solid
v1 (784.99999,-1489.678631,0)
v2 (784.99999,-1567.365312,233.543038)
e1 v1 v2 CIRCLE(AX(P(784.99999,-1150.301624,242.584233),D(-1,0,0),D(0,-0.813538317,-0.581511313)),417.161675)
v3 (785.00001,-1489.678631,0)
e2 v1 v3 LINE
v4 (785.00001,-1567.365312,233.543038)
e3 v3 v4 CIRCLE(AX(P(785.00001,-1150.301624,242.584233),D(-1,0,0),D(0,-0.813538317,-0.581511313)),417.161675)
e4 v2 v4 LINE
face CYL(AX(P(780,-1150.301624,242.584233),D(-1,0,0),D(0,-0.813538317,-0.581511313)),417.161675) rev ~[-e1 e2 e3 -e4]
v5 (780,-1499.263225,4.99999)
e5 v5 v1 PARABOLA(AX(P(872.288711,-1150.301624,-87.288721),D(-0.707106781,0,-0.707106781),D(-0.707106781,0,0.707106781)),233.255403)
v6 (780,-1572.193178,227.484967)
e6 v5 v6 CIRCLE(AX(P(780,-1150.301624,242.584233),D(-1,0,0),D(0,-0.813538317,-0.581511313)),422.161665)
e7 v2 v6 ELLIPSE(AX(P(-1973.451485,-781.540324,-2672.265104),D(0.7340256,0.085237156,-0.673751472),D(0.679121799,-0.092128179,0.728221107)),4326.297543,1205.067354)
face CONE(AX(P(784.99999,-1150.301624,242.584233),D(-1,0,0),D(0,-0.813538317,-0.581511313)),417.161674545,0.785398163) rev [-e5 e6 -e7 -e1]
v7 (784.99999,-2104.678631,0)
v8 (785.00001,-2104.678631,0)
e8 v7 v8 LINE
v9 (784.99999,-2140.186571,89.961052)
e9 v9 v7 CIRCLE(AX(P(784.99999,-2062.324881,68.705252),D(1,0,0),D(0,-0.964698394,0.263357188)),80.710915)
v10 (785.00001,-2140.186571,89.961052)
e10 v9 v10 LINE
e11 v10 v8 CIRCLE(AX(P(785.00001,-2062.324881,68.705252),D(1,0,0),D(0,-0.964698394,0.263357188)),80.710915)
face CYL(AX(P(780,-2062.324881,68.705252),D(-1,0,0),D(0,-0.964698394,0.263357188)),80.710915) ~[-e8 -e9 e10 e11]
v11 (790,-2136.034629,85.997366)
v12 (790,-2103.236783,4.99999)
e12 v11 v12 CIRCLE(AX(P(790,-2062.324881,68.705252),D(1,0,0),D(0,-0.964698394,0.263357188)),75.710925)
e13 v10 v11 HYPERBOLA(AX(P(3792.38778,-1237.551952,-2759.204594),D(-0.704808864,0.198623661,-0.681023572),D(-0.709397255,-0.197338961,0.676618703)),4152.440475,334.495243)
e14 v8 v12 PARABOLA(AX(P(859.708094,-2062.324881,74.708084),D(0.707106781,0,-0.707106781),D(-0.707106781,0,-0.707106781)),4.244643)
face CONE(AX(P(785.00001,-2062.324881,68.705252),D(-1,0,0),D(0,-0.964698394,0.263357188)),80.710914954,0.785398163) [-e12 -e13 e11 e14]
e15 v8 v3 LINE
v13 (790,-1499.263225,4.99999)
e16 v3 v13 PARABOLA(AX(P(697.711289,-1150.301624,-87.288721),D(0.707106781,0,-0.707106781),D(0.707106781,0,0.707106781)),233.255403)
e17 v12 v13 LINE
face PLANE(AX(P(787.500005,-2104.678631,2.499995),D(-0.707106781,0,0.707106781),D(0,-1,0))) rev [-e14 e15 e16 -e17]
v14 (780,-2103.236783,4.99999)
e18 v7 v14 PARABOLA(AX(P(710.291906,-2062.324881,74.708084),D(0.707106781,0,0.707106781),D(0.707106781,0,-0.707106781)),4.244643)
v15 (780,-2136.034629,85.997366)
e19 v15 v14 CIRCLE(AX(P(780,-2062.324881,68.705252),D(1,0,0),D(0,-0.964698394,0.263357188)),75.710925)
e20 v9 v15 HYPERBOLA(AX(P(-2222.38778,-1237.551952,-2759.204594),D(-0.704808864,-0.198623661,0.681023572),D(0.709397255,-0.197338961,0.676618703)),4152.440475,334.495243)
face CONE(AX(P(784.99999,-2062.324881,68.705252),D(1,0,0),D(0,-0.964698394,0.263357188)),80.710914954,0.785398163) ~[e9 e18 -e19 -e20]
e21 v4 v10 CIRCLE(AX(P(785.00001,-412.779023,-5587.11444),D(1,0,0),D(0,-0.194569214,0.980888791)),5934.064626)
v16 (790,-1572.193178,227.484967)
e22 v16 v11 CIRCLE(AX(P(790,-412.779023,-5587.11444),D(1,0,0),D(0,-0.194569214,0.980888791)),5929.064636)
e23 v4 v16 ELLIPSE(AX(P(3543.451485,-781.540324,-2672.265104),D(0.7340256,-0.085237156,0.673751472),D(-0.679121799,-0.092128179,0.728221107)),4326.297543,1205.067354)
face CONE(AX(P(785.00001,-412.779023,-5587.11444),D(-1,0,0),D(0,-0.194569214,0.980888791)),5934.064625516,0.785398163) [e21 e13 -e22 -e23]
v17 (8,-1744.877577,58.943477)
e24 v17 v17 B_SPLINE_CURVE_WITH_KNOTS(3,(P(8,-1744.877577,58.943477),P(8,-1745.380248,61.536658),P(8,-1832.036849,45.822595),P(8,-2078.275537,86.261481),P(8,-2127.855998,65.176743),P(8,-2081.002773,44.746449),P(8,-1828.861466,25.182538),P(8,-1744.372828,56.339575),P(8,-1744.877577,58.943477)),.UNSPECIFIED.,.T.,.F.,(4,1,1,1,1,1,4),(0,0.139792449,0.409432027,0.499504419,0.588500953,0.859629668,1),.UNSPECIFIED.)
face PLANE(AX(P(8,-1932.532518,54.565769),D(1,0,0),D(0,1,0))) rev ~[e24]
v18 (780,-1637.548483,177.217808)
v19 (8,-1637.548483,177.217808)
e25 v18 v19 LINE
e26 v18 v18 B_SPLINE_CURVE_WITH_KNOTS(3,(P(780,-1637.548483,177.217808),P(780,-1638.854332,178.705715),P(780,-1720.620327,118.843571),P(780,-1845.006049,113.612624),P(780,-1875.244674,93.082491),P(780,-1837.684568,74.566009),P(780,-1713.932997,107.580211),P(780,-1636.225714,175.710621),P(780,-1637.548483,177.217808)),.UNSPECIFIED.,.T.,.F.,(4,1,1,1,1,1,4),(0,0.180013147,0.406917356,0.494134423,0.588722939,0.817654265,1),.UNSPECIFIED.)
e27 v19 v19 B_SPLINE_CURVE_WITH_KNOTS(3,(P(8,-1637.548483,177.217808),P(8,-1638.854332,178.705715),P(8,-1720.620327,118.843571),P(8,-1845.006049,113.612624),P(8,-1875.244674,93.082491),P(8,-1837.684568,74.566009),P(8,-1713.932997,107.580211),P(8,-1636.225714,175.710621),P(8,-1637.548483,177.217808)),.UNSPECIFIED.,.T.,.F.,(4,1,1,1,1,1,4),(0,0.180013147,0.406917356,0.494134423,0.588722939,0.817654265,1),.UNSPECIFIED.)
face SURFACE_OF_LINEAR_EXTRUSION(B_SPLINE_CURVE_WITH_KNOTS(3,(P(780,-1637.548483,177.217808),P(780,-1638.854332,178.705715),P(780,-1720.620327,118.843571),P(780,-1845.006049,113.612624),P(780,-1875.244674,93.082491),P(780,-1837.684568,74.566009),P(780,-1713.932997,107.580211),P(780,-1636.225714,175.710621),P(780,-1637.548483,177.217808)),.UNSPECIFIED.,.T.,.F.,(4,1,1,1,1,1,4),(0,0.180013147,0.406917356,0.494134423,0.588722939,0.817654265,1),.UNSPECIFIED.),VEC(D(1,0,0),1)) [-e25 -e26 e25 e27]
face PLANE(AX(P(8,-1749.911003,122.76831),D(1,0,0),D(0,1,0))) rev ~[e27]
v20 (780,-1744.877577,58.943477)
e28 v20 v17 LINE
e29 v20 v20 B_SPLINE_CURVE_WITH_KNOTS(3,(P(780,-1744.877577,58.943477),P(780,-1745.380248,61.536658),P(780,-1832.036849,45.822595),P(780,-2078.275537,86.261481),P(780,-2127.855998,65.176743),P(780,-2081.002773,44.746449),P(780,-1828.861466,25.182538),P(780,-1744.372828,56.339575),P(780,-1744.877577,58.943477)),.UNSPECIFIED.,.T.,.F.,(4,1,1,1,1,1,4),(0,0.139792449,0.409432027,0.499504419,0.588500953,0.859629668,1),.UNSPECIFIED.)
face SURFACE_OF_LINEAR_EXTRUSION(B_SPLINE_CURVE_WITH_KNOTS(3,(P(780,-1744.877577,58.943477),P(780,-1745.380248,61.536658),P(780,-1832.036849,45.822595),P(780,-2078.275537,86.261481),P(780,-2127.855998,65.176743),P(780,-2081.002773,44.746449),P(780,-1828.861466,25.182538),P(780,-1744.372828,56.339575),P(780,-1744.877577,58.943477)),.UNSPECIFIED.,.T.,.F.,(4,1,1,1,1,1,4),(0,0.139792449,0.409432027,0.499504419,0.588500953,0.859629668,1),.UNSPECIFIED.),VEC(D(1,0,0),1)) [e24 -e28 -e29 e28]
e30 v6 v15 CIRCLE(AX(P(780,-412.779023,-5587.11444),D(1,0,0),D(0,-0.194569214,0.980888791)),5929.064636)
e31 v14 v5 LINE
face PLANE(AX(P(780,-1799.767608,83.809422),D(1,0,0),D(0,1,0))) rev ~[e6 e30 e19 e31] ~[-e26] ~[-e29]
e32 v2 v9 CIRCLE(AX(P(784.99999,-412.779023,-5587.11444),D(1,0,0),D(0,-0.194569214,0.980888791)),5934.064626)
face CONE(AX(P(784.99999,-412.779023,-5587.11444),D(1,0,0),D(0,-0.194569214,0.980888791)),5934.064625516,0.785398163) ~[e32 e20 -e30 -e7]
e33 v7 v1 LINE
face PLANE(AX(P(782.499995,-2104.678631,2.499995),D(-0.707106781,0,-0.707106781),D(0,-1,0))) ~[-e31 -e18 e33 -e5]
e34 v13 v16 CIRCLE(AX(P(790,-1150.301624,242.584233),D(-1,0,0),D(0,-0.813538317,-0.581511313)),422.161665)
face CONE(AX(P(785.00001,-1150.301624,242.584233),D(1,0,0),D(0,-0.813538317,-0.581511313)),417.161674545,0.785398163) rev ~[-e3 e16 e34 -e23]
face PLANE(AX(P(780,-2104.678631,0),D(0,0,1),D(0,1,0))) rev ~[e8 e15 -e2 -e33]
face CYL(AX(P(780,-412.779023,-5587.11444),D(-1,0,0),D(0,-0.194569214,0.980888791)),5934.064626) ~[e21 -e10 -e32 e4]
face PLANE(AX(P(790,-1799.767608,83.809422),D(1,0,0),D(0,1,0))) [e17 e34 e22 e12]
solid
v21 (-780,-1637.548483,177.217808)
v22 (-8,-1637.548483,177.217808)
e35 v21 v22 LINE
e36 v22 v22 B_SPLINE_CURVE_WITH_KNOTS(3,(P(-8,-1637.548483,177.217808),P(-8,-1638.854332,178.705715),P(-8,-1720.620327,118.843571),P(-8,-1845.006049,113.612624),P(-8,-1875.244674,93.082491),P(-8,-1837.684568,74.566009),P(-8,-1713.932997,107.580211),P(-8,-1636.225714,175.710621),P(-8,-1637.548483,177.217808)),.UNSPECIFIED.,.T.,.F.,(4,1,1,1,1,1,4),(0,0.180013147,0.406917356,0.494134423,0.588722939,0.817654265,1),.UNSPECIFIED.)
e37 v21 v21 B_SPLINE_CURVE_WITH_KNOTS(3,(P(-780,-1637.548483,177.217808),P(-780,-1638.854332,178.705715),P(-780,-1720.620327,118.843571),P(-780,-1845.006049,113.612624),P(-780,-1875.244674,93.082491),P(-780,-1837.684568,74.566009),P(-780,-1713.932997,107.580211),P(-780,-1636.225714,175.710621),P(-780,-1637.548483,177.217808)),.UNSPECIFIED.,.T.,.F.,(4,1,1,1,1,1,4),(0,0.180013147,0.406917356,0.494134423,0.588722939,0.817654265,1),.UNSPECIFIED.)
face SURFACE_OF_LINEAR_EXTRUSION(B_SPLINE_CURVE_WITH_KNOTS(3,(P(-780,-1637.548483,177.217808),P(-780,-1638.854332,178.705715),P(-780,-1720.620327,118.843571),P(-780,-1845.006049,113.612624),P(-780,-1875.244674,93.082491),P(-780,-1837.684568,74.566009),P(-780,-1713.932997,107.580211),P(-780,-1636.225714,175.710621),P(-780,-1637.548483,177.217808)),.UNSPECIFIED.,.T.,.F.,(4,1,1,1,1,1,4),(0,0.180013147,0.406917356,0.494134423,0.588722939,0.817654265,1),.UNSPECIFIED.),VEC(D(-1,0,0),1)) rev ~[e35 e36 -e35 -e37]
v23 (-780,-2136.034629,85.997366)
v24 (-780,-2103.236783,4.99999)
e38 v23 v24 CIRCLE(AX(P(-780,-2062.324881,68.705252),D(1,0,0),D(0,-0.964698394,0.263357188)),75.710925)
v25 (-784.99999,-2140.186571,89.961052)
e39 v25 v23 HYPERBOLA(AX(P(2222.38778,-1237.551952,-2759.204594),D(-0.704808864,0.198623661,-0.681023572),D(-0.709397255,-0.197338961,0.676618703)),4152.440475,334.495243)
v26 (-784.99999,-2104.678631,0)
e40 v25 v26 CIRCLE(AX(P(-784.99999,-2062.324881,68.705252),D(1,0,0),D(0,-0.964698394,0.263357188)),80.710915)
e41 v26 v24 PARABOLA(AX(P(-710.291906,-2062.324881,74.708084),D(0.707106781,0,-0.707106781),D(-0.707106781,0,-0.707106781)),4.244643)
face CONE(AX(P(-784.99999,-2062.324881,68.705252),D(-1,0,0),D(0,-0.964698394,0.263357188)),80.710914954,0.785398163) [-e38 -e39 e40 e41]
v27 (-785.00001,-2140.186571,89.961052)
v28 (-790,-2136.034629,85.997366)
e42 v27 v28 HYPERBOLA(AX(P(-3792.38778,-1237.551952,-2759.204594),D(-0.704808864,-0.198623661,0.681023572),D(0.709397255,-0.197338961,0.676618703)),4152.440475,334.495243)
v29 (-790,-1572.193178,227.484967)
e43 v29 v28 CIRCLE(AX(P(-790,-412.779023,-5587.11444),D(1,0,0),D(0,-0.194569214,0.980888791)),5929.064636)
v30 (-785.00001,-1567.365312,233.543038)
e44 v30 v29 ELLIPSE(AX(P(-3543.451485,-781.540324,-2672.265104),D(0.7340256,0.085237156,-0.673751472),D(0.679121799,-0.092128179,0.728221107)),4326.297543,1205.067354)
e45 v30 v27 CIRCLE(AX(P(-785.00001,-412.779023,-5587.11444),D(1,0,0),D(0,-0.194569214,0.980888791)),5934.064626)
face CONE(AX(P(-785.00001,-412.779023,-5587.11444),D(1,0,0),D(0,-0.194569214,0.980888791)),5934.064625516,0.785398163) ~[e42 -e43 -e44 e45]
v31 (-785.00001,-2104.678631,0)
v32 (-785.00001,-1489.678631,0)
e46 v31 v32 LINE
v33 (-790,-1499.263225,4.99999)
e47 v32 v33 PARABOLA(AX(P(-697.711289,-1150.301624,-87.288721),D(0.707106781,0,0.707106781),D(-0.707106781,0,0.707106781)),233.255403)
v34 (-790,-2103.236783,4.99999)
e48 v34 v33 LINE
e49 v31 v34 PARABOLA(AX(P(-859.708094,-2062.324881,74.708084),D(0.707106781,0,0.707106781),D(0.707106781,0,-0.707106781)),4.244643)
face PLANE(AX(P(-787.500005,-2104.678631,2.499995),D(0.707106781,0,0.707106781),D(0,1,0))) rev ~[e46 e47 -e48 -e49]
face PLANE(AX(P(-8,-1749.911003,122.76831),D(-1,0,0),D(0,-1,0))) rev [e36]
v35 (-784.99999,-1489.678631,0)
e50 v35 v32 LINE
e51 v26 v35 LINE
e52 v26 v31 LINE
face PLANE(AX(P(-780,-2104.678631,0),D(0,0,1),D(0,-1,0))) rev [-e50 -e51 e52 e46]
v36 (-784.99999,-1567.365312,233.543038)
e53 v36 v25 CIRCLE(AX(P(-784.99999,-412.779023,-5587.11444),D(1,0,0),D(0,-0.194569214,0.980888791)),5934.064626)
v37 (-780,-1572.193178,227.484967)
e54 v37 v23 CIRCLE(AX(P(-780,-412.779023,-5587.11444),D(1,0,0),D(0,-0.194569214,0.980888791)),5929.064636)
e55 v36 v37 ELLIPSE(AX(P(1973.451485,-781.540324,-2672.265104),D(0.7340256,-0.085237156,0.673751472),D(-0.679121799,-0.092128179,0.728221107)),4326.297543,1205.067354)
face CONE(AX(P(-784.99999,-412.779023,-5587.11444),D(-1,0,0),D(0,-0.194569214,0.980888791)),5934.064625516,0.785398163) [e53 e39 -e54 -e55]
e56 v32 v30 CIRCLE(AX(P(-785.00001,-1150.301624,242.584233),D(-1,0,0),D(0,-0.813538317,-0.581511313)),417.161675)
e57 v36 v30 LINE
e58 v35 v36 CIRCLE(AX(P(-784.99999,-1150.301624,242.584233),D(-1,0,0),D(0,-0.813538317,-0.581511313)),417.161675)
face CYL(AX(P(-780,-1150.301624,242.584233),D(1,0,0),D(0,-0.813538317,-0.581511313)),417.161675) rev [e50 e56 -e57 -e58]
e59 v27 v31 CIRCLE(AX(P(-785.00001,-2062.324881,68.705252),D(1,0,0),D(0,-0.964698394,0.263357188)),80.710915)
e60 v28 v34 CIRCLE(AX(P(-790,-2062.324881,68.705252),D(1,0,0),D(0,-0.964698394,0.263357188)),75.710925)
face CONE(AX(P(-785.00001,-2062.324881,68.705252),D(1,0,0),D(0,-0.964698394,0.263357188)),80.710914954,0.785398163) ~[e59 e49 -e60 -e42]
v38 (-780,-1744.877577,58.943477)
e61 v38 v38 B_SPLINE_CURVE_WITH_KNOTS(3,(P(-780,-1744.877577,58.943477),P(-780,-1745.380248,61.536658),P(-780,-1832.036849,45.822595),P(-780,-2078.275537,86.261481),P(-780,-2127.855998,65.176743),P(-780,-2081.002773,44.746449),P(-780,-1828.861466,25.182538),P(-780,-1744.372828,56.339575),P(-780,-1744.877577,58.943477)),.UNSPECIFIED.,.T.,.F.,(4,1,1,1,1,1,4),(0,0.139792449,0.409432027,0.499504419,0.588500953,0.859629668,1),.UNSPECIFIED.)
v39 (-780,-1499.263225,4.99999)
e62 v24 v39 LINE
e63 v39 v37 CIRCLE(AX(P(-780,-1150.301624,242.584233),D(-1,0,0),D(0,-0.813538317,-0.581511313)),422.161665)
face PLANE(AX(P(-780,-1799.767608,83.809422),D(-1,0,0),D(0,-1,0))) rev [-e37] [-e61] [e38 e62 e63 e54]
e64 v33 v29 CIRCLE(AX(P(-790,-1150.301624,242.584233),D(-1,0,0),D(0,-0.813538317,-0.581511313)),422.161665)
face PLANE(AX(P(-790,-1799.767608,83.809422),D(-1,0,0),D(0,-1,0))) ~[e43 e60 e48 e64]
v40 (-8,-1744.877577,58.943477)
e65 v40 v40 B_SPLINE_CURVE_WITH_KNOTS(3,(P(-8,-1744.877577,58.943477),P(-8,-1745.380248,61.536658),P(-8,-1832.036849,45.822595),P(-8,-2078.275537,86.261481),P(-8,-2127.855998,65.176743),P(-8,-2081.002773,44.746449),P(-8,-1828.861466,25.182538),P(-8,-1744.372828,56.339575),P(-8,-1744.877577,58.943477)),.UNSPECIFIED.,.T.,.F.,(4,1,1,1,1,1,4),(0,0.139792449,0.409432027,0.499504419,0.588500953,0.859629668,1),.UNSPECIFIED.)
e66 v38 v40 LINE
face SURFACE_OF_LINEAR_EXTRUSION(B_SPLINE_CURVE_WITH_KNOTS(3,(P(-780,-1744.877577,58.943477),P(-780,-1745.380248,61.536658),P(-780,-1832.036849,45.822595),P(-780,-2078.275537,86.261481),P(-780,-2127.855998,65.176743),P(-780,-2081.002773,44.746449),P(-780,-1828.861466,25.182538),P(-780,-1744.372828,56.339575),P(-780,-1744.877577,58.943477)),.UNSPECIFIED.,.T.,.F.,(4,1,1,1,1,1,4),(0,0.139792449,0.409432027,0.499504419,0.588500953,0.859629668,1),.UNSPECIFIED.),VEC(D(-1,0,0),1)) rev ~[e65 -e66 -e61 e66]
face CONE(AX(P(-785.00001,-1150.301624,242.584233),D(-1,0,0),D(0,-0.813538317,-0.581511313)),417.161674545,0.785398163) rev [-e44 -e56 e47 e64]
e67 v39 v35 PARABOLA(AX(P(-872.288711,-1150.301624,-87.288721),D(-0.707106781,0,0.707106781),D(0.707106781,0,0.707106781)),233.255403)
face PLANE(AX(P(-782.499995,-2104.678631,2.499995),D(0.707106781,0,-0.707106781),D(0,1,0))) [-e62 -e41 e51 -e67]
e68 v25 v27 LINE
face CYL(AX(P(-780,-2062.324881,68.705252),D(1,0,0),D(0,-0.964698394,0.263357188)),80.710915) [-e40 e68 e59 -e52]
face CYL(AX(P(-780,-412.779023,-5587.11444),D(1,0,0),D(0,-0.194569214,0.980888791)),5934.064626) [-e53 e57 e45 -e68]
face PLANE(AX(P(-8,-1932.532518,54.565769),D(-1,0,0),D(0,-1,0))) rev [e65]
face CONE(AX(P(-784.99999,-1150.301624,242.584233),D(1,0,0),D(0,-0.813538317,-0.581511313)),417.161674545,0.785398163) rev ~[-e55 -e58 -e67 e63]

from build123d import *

# Parameters (mm, degrees)
F2_DEPTH = 772
F4_DEPTH = 10
F5_SIZE  = 4.99999


# Not quite as in the source:
# - a fillet or chamfer is up to 0.001 mm smaller than in the source, because OpenCascade refuses the exact size


with BuildPart() as f2:
    # F1 (on offset) → F2 (new body)
    with BuildSketch(Plane.YZ.offset(780)):
        with BuildLine():
            add(Edge.make_bspline(
                [(-1744.877576828, 58.9434765279), (-1745.3802478559, 61.5366577599), (-1832.0368493958, 45.8225946383), (-2078.2755369764, 86.2614809539), (-2127.8559983427, 65.176742592), (-2081.002772978, 44.746449474), (-1828.8614657532, 25.1825377325), (-1744.3728278282, 56.3395754464), (-1744.877576828, 58.9434765279)],
                knots=[0, 0, 0, 0, 0.139792449, 0.4094320274, 0.4995044186, 0.5885009526, 0.8596296685, 1, 1, 1, 1], degree=3))
        make_face()
    extrude(amount=-F2_DEPTH)



with BuildPart() as f2b:
    # F1 (on offset) → F2, piece 2 (new body)
    with BuildSketch(Plane.YZ.offset(780)):
        with BuildLine():
            add(Edge.make_bspline(
                [(-1637.5484834412, 177.2178078336), (-1638.8543316655, 178.7057145257), (-1720.620327133, 118.8435706221), (-1845.0060490817, 113.6126241583), (-1875.2446737796, 93.082491228), (-1837.6845680548, 74.5660088647), (-1713.9329969259, 107.5802112125), (-1636.2257141975, 175.710621031), (-1637.5484834412, 177.2178078336)],
                knots=[0, 0, 0, 0, 0.1800131474, 0.4069173565, 0.4941344226, 0.5887229388, 0.8176542646, 1, 1, 1, 1], degree=3))
        make_face()
    extrude(amount=-F2_DEPTH)


with BuildPart() as f2_1:
    add(f2.part)

    add(f2b.part)  # F4 merges F2b
    # F3 (on face) → F4 (join)
    with BuildSketch(Plane.YZ.offset(780)):
        with BuildLine():
            ThreePointArc((-2140.186571362, 89.9610519409), (-2137.3994155737, 39.0730721669), (-2104.6786308289, 0))
            Line((-2104.6786308289, 0), (-1489.6786308289, 0))
            ThreePointArc((-1489.6786308289, 0), (-1546.1377249923, 110.9117451388), (-1567.3653118634, 233.5430383682))
            ThreePointArc((-1567.3653118634, 233.5430383682), (-1855.5631600625, 168.8821646693), (-2140.186571362, 89.9610519409))
        make_face()
        with BuildLine():
            add(Edge.make_bspline(
                [(-1744.877576828, 58.9434765279), (-1745.3802478559, 61.5366577599), (-1832.0368493958, 45.8225946383), (-2078.2755369764, 86.2614809539), (-2127.8559983427, 65.176742592), (-2081.002772978, 44.746449474), (-1828.8614657532, 25.1825377325), (-1744.3728278282, 56.3395754464), (-1744.877576828, 58.9434765279)],
                knots=[0, 0, 0, 0, 0.139792449, 0.4094320274, 0.4995044186, 0.5885009526, 0.8596296685, 1, 1, 1, 1], degree=3))
        make_face(mode=Mode.SUBTRACT)
        with BuildLine():
            add(Edge.make_bspline(
                [(-1744.877576828, 58.9434765279), (-1745.3802478559, 61.5366577599), (-1832.0368493958, 45.8225946383), (-2078.2755369764, 86.2614809539), (-2127.8559983427, 65.176742592), (-2081.002772978, 44.746449474), (-1828.8614657532, 25.1825377325), (-1744.3728278282, 56.3395754464), (-1744.877576828, 58.9434765279)],
                knots=[0, 0, 0, 0, 0.139792449, 0.4094320274, 0.4995044186, 0.5885009526, 0.8596296685, 1, 1, 1, 1], degree=3))
        make_face()
    extrude(amount=F4_DEPTH)

    # F5 (size 5 in the source; OpenCascade refuses exactly that, so slightly less here)
    f5_edges = [f2_1.edges().sort_by_distance(p)[0] for p in [
        (780, -1855.56316, 168.882165),
        (780, -1546.137725, 110.911745),
        (780, -2137.399416, 39.073072),
        (780, -1797.178631, 0),
        (790, -1855.56316, 168.882165),
        (790, -2137.399416, 39.073072),
        (790, -1797.178631, 0),
        (790, -1546.137725, 110.911745),
    ]]
    chamfer(f5_edges, length=F5_SIZE)


with BuildPart() as f6_1:
    # F6: instance of F2
    add(f2_1.part.mirror(Plane.YZ))


solid = Compound([f2_1.part, f6_1.part])
